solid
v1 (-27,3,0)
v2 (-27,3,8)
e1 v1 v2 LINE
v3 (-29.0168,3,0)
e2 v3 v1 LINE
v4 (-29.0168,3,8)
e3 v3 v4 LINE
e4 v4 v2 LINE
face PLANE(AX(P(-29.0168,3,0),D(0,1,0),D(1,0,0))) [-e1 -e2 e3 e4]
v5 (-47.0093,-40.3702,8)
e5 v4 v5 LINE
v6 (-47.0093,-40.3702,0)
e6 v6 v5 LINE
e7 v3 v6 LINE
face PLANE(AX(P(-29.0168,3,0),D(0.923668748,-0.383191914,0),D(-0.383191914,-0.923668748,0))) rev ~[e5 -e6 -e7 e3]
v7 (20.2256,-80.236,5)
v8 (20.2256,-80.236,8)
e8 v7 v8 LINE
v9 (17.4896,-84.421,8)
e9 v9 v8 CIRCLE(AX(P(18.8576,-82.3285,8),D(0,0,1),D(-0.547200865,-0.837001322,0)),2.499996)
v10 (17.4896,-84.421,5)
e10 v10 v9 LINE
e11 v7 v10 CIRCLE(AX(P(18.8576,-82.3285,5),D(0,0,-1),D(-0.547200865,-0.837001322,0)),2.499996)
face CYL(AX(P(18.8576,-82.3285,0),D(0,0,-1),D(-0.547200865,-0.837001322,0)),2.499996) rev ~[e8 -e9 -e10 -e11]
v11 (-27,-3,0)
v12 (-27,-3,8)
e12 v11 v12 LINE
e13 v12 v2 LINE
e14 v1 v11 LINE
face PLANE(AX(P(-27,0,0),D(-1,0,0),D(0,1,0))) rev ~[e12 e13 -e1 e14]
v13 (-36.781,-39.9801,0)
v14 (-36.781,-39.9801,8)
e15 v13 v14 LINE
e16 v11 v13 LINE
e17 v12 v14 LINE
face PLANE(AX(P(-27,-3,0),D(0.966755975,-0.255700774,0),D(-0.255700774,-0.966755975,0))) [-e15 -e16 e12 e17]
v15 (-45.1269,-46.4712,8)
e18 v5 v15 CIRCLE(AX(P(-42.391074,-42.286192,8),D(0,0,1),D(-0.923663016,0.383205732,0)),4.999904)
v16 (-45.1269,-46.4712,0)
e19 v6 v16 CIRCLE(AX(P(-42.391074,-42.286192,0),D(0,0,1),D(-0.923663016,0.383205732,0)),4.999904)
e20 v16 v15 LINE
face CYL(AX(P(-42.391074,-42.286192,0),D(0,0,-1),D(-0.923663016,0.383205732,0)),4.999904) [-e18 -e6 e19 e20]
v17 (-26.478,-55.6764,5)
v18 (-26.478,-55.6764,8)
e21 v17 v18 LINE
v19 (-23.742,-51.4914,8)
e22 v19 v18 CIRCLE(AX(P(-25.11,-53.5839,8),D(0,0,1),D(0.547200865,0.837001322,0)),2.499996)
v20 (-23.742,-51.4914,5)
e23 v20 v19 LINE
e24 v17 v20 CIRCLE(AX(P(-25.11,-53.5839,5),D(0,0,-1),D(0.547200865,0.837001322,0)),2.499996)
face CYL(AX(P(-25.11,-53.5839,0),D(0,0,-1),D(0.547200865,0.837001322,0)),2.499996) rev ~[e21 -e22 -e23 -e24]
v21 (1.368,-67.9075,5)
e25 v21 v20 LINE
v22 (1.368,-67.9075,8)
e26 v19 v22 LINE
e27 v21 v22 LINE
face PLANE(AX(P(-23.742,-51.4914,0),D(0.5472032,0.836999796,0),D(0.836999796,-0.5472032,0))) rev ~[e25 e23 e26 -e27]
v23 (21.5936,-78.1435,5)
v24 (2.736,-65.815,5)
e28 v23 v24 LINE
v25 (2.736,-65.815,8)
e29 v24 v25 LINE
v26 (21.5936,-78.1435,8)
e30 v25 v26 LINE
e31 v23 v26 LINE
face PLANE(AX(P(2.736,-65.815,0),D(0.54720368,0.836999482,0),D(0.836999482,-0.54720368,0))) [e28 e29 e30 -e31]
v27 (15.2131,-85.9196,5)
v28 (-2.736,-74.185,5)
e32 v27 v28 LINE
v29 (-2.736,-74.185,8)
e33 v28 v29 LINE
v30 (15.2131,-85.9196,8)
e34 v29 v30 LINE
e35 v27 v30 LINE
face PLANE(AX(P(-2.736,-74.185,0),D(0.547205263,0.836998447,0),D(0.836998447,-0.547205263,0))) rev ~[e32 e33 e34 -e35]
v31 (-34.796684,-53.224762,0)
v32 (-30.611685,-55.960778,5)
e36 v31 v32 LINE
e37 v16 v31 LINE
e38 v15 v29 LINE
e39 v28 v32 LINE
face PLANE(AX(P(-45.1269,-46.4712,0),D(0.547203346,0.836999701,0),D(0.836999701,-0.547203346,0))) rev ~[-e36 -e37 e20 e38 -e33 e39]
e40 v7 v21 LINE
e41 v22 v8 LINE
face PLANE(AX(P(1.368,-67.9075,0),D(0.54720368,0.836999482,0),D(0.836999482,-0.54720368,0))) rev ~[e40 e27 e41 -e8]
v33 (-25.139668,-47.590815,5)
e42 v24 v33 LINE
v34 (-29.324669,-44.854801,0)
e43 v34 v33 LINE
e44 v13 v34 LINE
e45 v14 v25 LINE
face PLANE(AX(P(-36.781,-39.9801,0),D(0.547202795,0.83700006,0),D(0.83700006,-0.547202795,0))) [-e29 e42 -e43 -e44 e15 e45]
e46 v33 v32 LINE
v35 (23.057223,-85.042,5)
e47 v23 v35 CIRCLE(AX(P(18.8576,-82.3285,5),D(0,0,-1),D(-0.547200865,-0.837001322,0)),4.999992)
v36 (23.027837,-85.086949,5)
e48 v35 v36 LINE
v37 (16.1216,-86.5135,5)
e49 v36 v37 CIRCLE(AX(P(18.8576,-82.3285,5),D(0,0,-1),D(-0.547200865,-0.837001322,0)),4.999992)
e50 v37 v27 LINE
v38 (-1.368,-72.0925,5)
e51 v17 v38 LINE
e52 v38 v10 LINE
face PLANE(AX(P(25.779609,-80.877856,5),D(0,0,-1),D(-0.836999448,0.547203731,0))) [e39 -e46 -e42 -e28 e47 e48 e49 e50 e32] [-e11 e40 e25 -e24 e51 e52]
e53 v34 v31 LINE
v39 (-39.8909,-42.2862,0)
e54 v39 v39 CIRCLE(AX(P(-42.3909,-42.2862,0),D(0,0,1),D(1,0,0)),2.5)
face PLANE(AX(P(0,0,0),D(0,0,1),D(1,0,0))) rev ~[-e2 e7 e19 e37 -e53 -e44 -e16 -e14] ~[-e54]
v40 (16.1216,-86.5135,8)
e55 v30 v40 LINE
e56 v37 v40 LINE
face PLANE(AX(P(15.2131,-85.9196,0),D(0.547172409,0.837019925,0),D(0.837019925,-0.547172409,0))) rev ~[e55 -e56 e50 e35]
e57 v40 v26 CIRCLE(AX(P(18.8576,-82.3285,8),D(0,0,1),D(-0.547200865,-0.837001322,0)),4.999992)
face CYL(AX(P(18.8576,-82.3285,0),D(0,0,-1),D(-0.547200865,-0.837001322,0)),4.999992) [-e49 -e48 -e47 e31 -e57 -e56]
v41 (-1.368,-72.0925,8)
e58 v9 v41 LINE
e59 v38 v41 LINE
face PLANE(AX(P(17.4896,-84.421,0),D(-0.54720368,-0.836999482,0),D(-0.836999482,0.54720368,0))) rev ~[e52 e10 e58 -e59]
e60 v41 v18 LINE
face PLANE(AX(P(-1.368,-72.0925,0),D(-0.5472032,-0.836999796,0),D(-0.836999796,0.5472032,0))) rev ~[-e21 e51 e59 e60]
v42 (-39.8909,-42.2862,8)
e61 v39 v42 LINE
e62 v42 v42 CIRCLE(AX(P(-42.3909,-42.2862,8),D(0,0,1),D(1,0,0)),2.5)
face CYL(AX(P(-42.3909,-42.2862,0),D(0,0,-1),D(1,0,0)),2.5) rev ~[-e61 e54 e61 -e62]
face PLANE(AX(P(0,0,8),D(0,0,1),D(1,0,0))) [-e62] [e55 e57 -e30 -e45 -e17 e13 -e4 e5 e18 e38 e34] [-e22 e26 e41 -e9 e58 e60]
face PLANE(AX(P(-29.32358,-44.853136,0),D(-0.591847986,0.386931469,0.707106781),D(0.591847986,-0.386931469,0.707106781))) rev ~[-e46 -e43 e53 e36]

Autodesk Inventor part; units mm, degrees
ref_plane "YZ Plane" through (0, 0, 0) normal (1, 0, 0) x (0, 1, 0)
ref_plane "XZ Plane" through (0, 0, 0) normal (0, 1, 0) x (-1, 0, 0)
ref_plane "XY Plane" through (0, 0, 0) normal (0, 0, 1) x (1, 0, 0)
sketch "Sketch2" plane through (0, 0, 0) normal (0, 0, 1) x (1, 0, 0)
  line L0 (-27, 0) -> (18, 0) construction
  circle A0 centre (-42.3909, -42.2862) radius 2.5
  line L1 (-1.368, -72.0925) -> (-26.478, -55.6764)
  arc A1 (-23.742, -51.4914) -> (-26.478, -55.6764) centre (-25.11, -53.5839) ccw
  line L2 (-23.742, -51.4914) -> (1.368, -67.9075)
  arc A2 (-47.0093, -40.3702) -> (-45.1269, -46.4712) centre (-42.3909, -42.2862) ccw
  line L3 (-27, 0) -> (-27, 3)
  line L4 (-27, 3) -> (-27, -3)
  line L5 (-29.0168, 3) -> (-27, 3)
  line L6 (-27, 3) -> (-27, -3)
  line L7 (-29.0168, 3) -> (-47.0093, -40.3702)
  line L8 (-27, -3) -> (-36.781, -39.9801)
  line L9 (-45.1269, -46.4712) -> (-2.736, -74.185)
  line L10 (-36.781, -39.9801) -> (2.736, -65.815)
  line L11 (-2.736, -74.185) -> (15.2131, -85.9196)
  line L12 (2.736, -65.815) -> (21.5936, -78.1435)
  line L13 (15.2131, -85.9196) -> (16.1216, -86.5135)
  arc A3 (16.1216, -86.5135) -> (21.5936, -78.1435) centre (18.8576, -82.3285) ccw
  line L14 (1.368, -67.9075) -> (20.2256, -80.236)
  line L15 (17.4896, -84.421) -> (-1.368, -72.0925)
  arc A4 (17.4896, -84.421) -> (20.2256, -80.236) centre (18.8576, -82.3285) ccw
  point P0 (0, 0)
extrude "Extrusion2" add sketch "Sketch2" along normal blind 8
sketch "Sketch3" plane through (-36.781, -39.9801, 8) normal (0.5472037, 0.8369994, 0) x (0.8369994, -0.5472037, 0)
  line L0 (74.7426, 8) -> (74.7426, 0) projected
  line L1 (8.9084, 8) -> (74.7426, 8)
  line L2 (74.7426, 8) -> (74.7426, 3)
  line L3 (74.7426, 3) -> (13.9084, 3)
  line L4 (8.9084, 8) -> (13.9084, 3)
  line L5 (8.9084, 8) -> (15.9795, 8) construction
  point P0 (74.7426, 8)
  dimension "d30" = 5
  dimension "d31" = 45
extrude "Extrusion3" cut sketch "Sketch3" against normal blind 10
properties part number "Sliding linkage"
